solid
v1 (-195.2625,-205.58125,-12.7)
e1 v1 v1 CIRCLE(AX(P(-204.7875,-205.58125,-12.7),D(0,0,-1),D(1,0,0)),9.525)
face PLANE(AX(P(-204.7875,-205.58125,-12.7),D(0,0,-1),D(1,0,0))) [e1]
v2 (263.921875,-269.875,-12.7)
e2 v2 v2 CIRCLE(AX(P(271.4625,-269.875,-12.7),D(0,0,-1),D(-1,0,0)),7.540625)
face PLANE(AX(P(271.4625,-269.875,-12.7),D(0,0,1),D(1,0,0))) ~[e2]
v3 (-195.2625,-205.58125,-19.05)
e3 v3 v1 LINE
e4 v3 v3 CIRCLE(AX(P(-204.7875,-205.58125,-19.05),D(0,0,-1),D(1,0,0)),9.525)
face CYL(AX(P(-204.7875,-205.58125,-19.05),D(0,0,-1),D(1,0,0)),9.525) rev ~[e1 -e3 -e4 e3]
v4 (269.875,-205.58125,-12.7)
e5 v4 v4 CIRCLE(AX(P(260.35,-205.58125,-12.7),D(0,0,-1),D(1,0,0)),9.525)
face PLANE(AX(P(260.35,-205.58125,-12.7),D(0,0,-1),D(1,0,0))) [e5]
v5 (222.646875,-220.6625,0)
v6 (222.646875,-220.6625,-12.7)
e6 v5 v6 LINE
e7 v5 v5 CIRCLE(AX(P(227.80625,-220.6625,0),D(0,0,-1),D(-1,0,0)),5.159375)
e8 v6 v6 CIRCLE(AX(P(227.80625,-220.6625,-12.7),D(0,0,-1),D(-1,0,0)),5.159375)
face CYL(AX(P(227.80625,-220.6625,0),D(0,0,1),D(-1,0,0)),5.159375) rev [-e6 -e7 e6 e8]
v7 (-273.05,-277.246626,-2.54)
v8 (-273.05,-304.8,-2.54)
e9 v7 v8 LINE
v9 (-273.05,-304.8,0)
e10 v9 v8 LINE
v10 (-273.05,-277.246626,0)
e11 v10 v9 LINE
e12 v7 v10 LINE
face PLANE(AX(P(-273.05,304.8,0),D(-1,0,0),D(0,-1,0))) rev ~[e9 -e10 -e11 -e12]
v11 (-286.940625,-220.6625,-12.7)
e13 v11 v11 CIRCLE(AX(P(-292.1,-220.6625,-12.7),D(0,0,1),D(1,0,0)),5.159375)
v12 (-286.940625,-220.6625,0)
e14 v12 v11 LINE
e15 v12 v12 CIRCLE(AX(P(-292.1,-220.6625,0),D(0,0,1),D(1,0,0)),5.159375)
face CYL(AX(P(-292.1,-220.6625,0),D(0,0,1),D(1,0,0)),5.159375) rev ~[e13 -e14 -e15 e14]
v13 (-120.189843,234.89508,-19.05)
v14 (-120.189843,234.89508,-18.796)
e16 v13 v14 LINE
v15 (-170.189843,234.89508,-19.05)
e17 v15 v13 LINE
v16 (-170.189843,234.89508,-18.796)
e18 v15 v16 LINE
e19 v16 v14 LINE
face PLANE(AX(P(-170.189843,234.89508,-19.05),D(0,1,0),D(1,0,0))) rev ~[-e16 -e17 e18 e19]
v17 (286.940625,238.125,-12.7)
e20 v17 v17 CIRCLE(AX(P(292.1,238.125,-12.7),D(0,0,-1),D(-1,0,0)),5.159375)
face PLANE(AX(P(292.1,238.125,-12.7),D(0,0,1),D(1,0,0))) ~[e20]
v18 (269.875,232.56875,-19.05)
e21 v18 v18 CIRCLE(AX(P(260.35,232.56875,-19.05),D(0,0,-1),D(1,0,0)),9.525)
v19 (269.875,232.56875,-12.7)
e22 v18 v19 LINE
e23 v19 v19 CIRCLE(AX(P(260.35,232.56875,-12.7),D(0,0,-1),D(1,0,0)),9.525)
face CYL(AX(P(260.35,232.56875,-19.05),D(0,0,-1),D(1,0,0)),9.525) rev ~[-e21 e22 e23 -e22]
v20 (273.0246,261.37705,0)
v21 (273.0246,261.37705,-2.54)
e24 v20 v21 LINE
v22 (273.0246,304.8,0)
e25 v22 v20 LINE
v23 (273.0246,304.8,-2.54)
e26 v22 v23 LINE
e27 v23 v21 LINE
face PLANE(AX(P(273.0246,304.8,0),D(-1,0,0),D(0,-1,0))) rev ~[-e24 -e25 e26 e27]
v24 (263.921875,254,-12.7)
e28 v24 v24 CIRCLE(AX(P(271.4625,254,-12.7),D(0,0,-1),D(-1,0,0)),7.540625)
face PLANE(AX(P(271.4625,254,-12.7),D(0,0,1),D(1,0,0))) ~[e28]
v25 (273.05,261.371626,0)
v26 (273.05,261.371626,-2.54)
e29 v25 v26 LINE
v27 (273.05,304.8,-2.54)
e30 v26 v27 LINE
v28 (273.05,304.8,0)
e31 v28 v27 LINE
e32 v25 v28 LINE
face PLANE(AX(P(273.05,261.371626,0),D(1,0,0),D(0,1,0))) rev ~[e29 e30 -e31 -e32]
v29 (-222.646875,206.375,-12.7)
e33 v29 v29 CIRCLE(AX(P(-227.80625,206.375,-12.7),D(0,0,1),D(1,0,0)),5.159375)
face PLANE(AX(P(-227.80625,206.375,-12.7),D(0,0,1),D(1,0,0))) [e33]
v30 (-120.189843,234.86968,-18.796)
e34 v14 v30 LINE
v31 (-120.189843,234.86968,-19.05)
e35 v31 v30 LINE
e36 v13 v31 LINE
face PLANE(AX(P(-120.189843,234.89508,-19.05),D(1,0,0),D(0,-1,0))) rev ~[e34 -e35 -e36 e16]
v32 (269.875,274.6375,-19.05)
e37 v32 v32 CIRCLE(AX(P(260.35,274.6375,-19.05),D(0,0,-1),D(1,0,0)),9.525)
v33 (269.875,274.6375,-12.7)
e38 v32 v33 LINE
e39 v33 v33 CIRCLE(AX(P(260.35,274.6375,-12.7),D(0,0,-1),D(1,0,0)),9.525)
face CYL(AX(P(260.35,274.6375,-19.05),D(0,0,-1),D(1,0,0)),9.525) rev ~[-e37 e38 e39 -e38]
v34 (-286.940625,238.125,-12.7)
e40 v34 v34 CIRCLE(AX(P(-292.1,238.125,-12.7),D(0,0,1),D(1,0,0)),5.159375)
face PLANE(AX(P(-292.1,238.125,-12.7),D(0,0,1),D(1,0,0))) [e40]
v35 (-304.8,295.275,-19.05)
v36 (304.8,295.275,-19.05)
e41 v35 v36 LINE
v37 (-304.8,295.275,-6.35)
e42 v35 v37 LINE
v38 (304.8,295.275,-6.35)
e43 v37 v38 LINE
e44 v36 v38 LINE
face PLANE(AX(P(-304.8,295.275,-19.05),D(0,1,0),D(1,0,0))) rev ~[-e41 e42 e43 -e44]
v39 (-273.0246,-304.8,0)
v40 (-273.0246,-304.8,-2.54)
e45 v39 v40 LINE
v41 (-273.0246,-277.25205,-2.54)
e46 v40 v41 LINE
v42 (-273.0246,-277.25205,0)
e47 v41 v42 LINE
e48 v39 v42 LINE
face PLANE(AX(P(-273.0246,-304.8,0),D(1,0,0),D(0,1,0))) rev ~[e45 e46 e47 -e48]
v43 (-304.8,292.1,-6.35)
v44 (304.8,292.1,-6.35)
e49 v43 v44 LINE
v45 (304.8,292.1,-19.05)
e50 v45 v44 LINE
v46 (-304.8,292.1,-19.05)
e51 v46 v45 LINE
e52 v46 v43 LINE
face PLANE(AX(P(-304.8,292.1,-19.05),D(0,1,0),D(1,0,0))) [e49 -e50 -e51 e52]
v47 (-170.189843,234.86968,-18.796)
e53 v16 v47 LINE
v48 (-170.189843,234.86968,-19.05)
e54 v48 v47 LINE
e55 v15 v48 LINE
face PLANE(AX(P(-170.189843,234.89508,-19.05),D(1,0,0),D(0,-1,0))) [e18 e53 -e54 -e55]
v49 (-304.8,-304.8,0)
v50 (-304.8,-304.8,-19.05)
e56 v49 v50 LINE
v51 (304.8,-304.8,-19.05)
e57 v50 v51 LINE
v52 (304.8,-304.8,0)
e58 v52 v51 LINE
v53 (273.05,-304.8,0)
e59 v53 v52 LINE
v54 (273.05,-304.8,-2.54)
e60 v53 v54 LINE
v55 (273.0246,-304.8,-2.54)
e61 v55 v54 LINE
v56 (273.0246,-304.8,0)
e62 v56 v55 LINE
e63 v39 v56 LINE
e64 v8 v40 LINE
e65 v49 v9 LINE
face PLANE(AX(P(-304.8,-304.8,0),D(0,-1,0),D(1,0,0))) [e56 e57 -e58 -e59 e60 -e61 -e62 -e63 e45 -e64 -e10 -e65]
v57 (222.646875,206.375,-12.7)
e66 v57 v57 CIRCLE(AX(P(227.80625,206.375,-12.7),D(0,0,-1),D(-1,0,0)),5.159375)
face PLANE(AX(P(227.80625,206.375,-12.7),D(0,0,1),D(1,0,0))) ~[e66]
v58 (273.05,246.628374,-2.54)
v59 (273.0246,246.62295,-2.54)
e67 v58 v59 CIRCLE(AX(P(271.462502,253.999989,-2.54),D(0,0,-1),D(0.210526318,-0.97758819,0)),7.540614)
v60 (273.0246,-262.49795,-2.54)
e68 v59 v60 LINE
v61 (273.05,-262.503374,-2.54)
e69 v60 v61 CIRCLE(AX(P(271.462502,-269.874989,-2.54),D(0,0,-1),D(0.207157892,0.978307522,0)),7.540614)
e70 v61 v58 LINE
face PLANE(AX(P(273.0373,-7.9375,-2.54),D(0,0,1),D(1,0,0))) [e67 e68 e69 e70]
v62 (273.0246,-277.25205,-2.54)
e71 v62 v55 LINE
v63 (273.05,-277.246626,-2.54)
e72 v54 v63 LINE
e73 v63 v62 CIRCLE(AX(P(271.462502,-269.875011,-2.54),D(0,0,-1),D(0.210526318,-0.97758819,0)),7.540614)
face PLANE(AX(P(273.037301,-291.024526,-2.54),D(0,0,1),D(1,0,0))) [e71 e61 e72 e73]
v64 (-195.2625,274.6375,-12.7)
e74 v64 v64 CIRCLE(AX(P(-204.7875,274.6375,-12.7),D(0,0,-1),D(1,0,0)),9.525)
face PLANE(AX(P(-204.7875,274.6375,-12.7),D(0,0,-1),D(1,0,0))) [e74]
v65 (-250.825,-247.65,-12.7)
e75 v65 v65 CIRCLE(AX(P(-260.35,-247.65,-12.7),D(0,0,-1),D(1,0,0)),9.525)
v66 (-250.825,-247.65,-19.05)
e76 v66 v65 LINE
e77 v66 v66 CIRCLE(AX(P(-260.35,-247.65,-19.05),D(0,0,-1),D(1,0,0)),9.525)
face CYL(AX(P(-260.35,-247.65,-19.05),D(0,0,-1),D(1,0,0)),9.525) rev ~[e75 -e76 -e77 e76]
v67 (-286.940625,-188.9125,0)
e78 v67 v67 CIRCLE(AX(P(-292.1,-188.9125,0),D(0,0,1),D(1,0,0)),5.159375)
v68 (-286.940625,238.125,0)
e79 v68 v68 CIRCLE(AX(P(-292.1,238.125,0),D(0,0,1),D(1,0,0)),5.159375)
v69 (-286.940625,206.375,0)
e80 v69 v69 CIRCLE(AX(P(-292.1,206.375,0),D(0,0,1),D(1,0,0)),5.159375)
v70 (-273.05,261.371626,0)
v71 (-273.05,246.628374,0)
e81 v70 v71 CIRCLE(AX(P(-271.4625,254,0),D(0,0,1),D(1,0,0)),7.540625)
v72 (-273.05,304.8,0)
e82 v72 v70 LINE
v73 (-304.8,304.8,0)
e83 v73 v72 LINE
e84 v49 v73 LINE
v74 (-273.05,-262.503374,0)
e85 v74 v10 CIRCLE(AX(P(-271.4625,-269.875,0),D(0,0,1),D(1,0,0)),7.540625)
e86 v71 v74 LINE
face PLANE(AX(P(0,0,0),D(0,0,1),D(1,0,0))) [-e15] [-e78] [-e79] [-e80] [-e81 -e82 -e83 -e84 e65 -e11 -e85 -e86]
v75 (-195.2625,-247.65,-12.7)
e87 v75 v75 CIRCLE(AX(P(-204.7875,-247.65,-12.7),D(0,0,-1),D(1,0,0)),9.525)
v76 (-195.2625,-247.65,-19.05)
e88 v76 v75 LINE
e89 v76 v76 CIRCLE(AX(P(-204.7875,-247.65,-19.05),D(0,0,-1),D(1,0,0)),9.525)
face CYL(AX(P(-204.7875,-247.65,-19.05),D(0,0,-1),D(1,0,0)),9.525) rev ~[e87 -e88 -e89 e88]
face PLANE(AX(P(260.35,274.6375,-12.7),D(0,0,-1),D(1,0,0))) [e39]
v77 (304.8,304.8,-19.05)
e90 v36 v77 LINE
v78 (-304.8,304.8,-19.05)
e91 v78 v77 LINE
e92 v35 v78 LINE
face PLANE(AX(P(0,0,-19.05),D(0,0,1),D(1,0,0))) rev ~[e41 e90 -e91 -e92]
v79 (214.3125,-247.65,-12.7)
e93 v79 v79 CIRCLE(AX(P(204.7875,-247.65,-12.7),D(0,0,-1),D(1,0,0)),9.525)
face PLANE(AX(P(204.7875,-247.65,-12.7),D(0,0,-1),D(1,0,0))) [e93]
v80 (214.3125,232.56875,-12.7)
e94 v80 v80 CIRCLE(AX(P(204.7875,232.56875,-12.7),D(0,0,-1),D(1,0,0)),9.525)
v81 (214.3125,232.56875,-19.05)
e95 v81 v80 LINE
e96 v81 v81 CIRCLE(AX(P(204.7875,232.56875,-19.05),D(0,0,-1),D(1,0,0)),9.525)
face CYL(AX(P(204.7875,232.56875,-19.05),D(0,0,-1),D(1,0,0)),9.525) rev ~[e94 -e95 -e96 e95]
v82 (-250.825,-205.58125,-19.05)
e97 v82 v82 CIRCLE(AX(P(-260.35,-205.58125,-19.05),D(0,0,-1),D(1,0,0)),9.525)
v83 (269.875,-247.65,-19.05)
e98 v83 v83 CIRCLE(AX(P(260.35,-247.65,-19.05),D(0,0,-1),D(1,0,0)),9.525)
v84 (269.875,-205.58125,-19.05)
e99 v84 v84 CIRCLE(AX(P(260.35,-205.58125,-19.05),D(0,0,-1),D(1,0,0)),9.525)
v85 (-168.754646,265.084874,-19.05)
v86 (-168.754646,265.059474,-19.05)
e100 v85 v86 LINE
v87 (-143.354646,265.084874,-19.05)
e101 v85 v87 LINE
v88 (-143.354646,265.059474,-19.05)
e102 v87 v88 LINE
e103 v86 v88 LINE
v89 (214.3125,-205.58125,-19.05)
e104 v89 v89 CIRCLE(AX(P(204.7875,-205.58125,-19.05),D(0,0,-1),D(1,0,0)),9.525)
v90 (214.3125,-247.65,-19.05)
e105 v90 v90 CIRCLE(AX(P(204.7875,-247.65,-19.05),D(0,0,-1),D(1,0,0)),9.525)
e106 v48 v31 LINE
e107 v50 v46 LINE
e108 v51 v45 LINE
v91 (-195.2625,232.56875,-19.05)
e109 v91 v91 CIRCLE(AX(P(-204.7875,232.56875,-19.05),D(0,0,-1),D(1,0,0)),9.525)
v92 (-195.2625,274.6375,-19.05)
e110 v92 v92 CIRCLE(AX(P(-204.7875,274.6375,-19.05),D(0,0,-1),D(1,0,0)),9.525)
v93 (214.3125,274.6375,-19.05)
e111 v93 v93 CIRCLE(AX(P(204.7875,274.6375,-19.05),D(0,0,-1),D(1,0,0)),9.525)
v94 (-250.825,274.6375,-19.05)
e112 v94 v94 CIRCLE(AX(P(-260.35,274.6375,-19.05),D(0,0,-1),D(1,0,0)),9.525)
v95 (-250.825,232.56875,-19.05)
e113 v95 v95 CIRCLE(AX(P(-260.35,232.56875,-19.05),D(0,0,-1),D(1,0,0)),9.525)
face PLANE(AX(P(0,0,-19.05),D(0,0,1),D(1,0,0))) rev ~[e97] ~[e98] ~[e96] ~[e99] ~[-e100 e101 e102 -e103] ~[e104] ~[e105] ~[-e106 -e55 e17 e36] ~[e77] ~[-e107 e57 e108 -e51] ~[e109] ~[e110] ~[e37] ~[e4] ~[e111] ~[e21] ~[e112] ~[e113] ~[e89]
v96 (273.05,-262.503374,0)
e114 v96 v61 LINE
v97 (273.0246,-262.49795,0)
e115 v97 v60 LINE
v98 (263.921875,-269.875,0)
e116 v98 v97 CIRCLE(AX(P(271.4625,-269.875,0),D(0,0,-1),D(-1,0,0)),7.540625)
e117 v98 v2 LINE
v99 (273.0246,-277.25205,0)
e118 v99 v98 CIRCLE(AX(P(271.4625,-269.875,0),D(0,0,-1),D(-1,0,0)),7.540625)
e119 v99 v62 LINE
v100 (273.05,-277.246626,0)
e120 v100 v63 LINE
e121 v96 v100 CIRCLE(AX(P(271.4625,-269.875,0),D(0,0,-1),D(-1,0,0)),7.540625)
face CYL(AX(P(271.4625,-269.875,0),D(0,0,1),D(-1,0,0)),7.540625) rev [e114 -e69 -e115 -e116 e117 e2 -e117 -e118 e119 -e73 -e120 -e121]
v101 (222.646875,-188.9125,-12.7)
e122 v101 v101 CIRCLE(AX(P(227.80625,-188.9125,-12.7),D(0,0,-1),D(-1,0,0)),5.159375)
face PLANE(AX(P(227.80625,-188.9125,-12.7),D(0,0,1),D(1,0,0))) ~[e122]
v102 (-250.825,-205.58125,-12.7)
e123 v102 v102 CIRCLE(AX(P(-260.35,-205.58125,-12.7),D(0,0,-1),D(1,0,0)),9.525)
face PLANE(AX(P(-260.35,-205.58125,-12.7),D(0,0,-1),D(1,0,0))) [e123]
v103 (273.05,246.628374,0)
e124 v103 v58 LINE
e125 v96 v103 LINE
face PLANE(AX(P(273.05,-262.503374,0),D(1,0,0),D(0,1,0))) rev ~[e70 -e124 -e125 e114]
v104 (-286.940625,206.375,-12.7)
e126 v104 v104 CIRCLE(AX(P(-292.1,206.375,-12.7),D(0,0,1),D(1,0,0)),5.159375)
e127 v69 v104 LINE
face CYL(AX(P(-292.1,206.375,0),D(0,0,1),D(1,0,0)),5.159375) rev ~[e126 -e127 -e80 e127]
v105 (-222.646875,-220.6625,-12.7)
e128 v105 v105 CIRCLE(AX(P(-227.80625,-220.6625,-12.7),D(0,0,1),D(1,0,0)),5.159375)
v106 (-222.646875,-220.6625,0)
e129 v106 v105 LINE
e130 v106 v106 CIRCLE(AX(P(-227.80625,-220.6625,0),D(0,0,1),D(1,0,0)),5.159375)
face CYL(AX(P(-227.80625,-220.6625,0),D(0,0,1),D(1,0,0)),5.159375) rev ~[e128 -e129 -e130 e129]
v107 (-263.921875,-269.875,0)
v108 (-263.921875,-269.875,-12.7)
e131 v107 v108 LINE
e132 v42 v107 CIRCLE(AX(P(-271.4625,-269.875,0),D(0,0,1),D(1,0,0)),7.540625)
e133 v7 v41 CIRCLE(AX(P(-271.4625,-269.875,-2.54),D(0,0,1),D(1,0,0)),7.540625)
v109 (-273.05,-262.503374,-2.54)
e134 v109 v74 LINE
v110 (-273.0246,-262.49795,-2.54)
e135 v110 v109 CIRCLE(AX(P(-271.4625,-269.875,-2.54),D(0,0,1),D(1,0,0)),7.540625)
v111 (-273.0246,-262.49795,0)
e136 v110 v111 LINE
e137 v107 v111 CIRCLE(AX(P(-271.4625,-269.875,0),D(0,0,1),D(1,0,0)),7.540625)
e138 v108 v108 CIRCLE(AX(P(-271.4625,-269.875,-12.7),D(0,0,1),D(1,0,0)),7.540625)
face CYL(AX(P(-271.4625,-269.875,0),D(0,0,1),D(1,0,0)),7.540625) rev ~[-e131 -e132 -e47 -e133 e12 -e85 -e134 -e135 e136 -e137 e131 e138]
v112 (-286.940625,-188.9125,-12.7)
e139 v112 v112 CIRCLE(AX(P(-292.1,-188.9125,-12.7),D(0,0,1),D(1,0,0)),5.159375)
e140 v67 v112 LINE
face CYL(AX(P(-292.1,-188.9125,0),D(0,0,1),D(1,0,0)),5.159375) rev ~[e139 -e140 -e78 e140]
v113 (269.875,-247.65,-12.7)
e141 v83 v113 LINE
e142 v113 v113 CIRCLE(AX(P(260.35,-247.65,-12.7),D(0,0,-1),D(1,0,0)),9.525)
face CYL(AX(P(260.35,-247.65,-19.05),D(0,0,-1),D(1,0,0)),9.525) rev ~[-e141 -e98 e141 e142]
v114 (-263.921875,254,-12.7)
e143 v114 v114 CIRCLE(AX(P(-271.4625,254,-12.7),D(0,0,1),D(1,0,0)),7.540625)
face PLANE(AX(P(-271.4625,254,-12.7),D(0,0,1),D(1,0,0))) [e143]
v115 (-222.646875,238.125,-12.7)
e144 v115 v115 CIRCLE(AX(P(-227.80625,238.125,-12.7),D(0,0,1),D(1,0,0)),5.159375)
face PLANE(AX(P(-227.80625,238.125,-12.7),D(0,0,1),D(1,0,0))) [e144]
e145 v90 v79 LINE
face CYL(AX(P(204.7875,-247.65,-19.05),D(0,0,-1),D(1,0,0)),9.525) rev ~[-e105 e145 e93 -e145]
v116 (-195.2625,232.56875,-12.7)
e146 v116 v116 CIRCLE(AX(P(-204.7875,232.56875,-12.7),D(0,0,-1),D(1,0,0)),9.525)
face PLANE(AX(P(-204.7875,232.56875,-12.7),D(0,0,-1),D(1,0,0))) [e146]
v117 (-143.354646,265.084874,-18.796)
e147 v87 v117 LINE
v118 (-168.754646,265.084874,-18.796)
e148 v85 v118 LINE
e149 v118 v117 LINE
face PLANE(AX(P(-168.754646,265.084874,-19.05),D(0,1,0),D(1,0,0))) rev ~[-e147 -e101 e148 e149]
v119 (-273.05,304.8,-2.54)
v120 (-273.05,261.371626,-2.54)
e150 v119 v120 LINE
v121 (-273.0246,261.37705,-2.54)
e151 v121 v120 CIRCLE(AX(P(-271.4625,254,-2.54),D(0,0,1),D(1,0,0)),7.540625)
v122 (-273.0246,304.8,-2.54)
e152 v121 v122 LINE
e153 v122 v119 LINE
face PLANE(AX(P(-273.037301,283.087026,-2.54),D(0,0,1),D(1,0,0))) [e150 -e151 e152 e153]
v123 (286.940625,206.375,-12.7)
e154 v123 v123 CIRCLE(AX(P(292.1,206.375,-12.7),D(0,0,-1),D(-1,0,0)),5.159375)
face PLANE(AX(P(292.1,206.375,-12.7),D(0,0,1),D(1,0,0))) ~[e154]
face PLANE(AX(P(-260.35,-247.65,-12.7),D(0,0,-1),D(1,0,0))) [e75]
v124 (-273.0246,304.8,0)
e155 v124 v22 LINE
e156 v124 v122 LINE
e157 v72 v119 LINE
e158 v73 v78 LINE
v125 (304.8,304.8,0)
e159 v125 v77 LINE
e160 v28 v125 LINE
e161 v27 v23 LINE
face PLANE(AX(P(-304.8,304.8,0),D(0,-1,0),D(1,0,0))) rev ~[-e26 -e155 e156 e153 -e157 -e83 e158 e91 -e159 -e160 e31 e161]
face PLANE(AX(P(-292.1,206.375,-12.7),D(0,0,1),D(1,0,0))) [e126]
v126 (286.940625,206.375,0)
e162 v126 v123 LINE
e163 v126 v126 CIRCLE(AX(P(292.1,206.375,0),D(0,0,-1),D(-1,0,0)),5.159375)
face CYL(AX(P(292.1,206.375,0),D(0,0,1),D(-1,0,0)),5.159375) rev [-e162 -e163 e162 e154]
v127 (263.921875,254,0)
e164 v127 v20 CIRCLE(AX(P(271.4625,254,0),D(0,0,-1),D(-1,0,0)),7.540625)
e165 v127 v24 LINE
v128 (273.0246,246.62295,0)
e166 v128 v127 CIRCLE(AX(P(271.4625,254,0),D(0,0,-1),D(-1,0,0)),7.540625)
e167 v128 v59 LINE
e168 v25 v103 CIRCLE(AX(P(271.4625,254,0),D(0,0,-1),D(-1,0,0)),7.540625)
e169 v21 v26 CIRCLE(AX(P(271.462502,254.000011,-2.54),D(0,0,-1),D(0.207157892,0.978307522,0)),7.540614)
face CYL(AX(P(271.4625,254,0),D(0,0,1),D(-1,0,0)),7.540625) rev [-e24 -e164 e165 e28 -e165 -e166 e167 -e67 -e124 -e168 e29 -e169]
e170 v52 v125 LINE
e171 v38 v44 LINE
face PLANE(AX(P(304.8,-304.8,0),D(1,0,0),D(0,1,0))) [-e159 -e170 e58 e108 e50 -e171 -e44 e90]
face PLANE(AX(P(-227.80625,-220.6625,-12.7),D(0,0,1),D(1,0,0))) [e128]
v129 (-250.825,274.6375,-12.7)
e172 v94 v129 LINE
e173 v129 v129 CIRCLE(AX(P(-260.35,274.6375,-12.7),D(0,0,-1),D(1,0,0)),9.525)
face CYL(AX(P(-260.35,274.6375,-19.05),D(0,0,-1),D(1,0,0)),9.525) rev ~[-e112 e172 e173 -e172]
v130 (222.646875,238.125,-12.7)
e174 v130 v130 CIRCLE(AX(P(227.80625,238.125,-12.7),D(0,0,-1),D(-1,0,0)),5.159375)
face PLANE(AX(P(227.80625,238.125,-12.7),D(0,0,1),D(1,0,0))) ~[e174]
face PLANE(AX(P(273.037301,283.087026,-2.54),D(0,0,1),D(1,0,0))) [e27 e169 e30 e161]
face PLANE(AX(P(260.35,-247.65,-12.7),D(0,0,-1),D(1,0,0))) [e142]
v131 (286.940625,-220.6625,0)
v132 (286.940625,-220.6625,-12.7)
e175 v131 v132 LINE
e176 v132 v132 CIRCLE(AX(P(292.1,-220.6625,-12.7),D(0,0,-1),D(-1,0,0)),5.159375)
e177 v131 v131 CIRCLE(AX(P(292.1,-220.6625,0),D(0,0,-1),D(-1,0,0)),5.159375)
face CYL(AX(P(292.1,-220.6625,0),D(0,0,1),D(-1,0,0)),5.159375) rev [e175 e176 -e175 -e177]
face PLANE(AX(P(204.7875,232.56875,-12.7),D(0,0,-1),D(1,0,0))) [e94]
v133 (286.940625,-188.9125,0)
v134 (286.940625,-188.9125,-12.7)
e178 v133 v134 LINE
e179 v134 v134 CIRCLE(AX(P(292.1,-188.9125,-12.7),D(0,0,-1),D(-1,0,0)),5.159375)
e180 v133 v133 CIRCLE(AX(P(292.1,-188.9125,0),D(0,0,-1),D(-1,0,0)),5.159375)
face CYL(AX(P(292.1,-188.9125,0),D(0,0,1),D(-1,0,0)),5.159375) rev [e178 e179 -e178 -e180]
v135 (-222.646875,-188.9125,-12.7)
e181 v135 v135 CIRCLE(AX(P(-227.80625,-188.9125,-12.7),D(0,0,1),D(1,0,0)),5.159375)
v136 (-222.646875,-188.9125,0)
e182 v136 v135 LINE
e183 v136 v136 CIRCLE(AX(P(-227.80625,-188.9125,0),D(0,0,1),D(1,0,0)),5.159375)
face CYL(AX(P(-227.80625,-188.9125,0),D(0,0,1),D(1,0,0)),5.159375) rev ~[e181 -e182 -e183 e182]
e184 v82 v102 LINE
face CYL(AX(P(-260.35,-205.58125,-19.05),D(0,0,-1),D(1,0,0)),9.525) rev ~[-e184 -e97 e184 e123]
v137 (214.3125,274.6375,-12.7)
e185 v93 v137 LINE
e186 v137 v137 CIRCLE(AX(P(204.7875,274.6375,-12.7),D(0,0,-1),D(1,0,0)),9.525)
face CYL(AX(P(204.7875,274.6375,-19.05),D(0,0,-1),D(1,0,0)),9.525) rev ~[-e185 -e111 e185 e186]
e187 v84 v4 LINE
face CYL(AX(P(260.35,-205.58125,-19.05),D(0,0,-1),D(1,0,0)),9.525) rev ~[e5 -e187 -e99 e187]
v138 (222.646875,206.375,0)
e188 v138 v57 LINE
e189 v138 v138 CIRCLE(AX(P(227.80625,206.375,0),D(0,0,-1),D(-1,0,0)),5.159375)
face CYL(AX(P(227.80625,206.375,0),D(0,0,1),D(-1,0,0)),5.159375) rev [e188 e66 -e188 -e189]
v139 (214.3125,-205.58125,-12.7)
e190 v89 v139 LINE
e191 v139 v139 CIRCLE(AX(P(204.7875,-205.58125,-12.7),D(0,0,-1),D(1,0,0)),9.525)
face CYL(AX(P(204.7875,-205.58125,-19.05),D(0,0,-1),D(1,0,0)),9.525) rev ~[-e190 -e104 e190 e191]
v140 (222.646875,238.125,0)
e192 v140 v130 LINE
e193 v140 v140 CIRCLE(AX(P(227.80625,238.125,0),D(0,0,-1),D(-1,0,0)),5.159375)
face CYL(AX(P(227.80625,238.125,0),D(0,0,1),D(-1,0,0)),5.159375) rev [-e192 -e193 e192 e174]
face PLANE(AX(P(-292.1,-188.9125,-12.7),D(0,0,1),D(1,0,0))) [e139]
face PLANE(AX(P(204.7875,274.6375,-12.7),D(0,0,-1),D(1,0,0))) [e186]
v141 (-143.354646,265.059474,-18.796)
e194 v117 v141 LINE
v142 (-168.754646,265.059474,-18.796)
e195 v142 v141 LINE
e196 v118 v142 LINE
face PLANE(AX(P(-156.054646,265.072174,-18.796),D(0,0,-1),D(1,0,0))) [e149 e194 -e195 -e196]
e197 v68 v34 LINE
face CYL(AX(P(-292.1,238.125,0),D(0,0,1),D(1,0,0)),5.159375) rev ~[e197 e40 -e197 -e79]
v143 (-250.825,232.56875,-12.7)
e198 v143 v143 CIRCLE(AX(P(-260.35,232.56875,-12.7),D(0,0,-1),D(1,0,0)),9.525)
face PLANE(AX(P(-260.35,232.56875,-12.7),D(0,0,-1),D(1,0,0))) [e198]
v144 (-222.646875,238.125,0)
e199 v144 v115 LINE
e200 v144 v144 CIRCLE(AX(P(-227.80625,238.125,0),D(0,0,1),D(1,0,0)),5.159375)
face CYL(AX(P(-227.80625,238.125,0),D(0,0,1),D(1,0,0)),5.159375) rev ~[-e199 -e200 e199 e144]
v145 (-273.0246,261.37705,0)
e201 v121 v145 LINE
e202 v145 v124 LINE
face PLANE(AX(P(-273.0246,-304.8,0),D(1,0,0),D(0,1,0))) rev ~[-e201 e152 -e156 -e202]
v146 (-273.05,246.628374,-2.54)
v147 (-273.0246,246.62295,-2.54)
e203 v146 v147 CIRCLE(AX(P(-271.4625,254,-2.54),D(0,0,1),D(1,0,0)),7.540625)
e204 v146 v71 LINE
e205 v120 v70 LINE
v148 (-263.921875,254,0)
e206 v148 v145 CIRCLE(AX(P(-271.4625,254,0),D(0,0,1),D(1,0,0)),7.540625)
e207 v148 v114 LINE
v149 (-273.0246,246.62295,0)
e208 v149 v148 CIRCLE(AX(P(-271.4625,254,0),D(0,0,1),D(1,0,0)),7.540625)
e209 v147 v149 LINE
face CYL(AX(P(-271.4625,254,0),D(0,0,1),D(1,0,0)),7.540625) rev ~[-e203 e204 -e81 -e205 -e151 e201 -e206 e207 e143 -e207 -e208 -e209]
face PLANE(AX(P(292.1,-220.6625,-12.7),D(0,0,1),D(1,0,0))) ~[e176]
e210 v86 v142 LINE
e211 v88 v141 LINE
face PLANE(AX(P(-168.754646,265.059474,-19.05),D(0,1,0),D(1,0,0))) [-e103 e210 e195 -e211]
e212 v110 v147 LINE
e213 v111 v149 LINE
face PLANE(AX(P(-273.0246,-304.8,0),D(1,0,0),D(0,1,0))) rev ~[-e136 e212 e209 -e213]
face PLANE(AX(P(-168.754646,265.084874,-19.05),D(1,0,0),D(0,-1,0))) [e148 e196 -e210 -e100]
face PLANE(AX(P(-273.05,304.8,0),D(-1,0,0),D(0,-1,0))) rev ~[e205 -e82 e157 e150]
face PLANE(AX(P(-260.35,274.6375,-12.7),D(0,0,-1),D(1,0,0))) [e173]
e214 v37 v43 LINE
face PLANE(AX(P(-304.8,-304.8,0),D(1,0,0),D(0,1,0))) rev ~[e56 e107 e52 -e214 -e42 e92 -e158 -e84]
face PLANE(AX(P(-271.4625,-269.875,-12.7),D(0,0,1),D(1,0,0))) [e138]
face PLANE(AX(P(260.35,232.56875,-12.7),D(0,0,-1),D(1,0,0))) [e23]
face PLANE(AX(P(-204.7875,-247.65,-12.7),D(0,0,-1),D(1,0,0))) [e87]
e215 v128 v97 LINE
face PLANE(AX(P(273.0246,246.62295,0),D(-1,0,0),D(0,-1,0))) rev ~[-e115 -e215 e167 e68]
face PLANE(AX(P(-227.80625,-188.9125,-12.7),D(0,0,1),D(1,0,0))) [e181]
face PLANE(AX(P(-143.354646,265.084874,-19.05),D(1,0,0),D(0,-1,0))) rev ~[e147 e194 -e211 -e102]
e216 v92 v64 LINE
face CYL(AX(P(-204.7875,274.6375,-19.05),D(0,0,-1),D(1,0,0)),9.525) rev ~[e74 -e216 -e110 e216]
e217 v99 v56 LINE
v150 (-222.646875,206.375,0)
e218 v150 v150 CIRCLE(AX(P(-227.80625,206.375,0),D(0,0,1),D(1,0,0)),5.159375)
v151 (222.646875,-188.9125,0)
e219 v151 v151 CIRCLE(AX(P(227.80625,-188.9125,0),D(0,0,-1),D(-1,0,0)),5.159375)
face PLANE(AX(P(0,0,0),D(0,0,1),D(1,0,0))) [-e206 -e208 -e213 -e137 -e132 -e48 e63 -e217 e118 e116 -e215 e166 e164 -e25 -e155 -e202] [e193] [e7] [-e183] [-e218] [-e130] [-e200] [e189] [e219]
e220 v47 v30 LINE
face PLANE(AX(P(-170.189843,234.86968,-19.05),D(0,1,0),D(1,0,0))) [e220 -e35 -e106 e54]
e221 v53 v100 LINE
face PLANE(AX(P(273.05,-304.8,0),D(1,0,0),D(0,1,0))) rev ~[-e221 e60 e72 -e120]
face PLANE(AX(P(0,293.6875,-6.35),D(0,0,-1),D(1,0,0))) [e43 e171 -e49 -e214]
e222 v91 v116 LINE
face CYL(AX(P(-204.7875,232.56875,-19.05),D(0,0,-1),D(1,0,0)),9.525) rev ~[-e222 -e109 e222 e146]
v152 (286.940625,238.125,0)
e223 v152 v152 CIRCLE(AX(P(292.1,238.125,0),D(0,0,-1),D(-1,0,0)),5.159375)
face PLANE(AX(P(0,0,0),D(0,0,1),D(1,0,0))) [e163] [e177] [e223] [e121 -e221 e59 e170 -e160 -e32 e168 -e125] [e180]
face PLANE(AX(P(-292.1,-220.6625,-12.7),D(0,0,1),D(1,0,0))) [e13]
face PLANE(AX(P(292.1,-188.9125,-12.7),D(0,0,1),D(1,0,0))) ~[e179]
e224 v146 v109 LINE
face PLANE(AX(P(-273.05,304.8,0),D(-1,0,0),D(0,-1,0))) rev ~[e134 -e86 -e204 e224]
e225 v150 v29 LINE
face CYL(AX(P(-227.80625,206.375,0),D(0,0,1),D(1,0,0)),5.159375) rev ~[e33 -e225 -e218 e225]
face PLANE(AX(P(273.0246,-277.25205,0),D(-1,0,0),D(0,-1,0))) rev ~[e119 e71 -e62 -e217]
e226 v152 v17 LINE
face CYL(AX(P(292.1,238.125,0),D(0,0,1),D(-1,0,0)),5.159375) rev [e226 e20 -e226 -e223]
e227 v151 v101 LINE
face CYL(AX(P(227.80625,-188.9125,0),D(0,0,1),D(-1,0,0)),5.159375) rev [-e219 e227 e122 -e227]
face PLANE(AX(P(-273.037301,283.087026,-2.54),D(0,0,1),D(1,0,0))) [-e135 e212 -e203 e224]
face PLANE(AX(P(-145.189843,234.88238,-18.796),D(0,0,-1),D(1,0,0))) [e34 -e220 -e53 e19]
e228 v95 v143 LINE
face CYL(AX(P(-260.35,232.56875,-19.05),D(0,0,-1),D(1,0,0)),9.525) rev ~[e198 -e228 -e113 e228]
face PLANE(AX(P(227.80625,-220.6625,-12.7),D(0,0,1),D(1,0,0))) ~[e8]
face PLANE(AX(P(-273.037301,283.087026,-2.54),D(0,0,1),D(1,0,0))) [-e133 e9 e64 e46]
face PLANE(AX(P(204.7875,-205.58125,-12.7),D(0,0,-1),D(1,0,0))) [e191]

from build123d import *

# Parameters (mm, degrees)
F0_W      = 609.6
F0_H      = 609.6
F0_R      = 7.540625
F0_R_2    = 5.159375
F1_DEPTH  = 19.05
F2_DEPTH  = 12.7
F3_W      = 609.6
F3_H      = 3.175
F4_DEPTH  = 12.7
F5_R      = 9.525
F6_DEPTH  = 6.35
F7_W      = 25.4
F7_H      = 0.0254
F7_W_2    = 50
F8_DEPTH  = 0.254
F10_DEPTH = 2.54


# Not quite as in the source:
# - a pattern or mirror of a feature is missing from the dataset's text; its kind, count and spacing are read off the source's solid


with BuildPart() as f1:
    # F0 (on Top) → F1 (new body)
    with BuildSketch(Plane.XY):
        Rectangle(F0_W, F0_H)
        with Locations((-271.4625, -269.875)):
            Circle(F0_R, mode=Mode.SUBTRACT)
        with Locations((-292.1, -220.6625)):
            Circle(F0_R_2, mode=Mode.SUBTRACT)
        with Locations((-292.1, -188.9125)):
            Circle(F0_R_2, mode=Mode.SUBTRACT)
        with Locations((-227.80625, -220.6625)):
            Circle(F0_R_2, mode=Mode.SUBTRACT)
        with Locations((-227.80625, -188.9125)):
            Circle(F0_R_2, mode=Mode.SUBTRACT)
        with Locations((-292.1, 206.375)):
            Circle(F0_R_2, mode=Mode.SUBTRACT)
        with Locations((-227.80625, 206.375)):
            Circle(F0_R_2, mode=Mode.SUBTRACT)
        with Locations((-292.1, 238.125)):
            Circle(F0_R_2, mode=Mode.SUBTRACT)
        with Locations((-271.4625, 254)):
            Circle(F0_R, mode=Mode.SUBTRACT)
        with Locations((-227.80625, 238.125)):
            Circle(F0_R_2, mode=Mode.SUBTRACT)
        with Locations((-271.4625, 254)):
            Circle(F0_R)
        with Locations((-292.1, 238.125)):
            Circle(F0_R_2)
        with Locations((-292.1, 206.375)):
            Circle(F0_R_2)
        with Locations((-227.80625, 206.375)):
            Circle(F0_R_2)
        with Locations((-227.80625, 238.125)):
            Circle(F0_R_2)
        with Locations((-227.80625, -188.9125)):
            Circle(F0_R_2)
        with Locations((-227.80625, -220.6625)):
            Circle(F0_R_2)
        with Locations((-292.1, -220.6625)):
            Circle(F0_R_2)
        with Locations((-292.1, -188.9125)):
            Circle(F0_R_2)
        with Locations((-271.4625, -269.875)):
            Circle(F0_R)
    extrude(amount=-F1_DEPTH)

    # F0 (on Top) → F2 (cut)
    with BuildSketch(Plane.XY):
        with Locations((-271.4625, -269.875)):
            Circle(F0_R)
        with Locations((-292.1, -220.6625)):
            Circle(F0_R_2)
        with Locations((-227.80625, -220.6625)):
            Circle(F0_R_2)
        with Locations((-227.80625, -188.9125)):
            Circle(F0_R_2)
        with Locations((-292.1, -188.9125)):
            Circle(F0_R_2)
        with Locations((-292.1, 206.375)):
            Circle(F0_R_2)
        with Locations((-227.80625, 206.375)):
            Circle(F0_R_2)
        with Locations((-227.80625, 238.125)):
            Circle(F0_R_2)
        with Locations((-292.1, 238.125)):
            Circle(F0_R_2)
        with Locations((-271.4625, 254)):
            Circle(F0_R)
    f2 = extrude(amount=-F2_DEPTH, mode=Mode.SUBTRACT)

    # F2_copies: F2 across plane
    add(f2.mirror(Plane(origin=(0, 0, 0), x_dir=(0, 0, 1), z_dir=(1, 0, 0))), mode=Mode.SUBTRACT)

    # F3 (on face) → F4 (cut)
    with BuildSketch(Plane(origin=(0, 0, -19.05), x_dir=(1, 0, 0), z_dir=(0, 0, -1))):
        with Locations((0, -293.6875)):
            Rectangle(F3_W, F3_H)
    extrude(amount=-F4_DEPTH, mode=Mode.SUBTRACT)

    # F5 (on face) → F6 (cut)
    with BuildSketch(Plane(origin=(0, 0, -19.05), x_dir=(1, 0, 0), z_dir=(0, 0, -1))):
        with Locations((260.35, -274.6375)):
            Circle(F5_R)
        with Locations((204.7875, -274.6375)):
            Circle(F5_R)
        with Locations((204.7875, -232.56875)):
            Circle(F5_R)
        with Locations((260.35, -232.56875)):
            Circle(F5_R)
        with Locations((-204.7875, -274.6375)):
            Circle(F5_R)
        with Locations((-260.35, -274.6375)):
            Circle(F5_R)
        with Locations((-260.35, -232.56875)):
            Circle(F5_R)
        with Locations((-204.7875, -232.56875)):
            Circle(F5_R)
        with Locations((-204.7875, 205.58125)):
            Circle(F5_R)
        with Locations((-260.35, 205.58125)):
            Circle(F5_R)
        with Locations((-260.35, 247.65)):
            Circle(F5_R)
        with Locations((-204.7875, 247.65)):
            Circle(F5_R)
        with Locations((204.7875, 247.65)):
            Circle(F5_R)
        with Locations((204.7875, 205.58125)):
            Circle(F5_R)
        with Locations((260.35, 205.58125)):
            Circle(F5_R)
        with Locations((260.35, 247.65)):
            Circle(F5_R)
    extrude(amount=-F6_DEPTH, mode=Mode.SUBTRACT)

    # F7 (on face) → F8 (cut)
    with BuildSketch(Plane(origin=(0, 0, -19.05), x_dir=(1, 0, 0), z_dir=(0, 0, -1))):
        with Locations((-156.0546457767, -265.0721735465)):
            Rectangle(F7_W, F7_H)
        with Locations((-145.1898425817, -234.882380328)):
            Rectangle(F7_W_2, F7_H)
    extrude(amount=-F8_DEPTH, mode=Mode.SUBTRACT)

    # F9 (on face) → F10 (cut)
    with BuildSketch(Plane.XY):
        with BuildLine():
            Line((-273.0246, 304.8), (-273.05, 304.8))
            Line((-273.05, 304.8), (-273.05, 261.3716259496))
            ThreePointArc((-273.05, 261.3716259496), (-273.0373023354, 261.3743489879), (-273.0246, 261.3770501544))
            Line((-273.0246, 261.3770501544), (-273.0246, 304.8))
        make_face()
        with BuildLine():
            ThreePointArc((-273.0246, 261.3770501544), (-273.0373023354, 261.3743489879), (-273.05, 261.3716259496))
            Line((-273.05, 261.3716259496), (-273.05, 246.6283740504))
            ThreePointArc((-273.05, 246.6283740504), (-273.0373023354, 246.6256510121), (-273.0246, 246.6229498456))
            Line((-273.0246, 246.6229498456), (-273.0246, 261.3770501544))
        make_face()
        with BuildLine():
            Line((273.05, 304.8), (273.0246, 304.8))
            Line((273.0246, 304.8), (273.0246, 261.3770501544))
            ThreePointArc((273.0246, 261.3770501544), (273.0373023354, 261.3743489879), (273.05, 261.3716259496))
            Line((273.05, 261.3716259496), (273.05, 304.8))
        make_face()
        with BuildLine():
            ThreePointArc((-273.0246, 246.6229498456), (-273.0373023354, 246.6256510121), (-273.05, 246.6283740504))
            Line((-273.05, 246.6283740504), (-273.05, -262.5033740504))
            ThreePointArc((-273.05, -262.5033740504), (-273.0373023354, -262.5006510121), (-273.0246, -262.4979498456))
            Line((-273.0246, -262.4979498456), (-273.0246, 246.6229498456))
        make_face()
        with BuildLine():
            ThreePointArc((-273.0246, -262.4979498456), (-273.0373023354, -262.5006510121), (-273.05, -262.5033740504))
            Line((-273.05, -262.5033740504), (-273.05, -277.2466259496))
            ThreePointArc((-273.05, -277.2466259496), (-273.0373023354, -277.2493489879), (-273.0246, -277.2520501544))
            Line((-273.0246, -277.2520501544), (-273.0246, -262.4979498456))
        make_face()
        with BuildLine():
            Line((-273.05, -277.2466259496), (-273.05, -304.8))
            Line((-273.05, -304.8), (-273.0246, -304.8))
            Line((-273.0246, -304.8), (-273.0246, -277.2520501544))
            ThreePointArc((-273.0246, -277.2520501544), (-273.0373023354, -277.2493489879), (-273.05, -277.2466259496))
        make_face()
        with BuildLine():
            ThreePointArc((273.05, 246.6283740504), (273.0373023354, 246.6256510121), (273.0246, 246.6229498456))
            Line((273.0246, 246.6229498456), (273.0246, -262.4979498456))
            ThreePointArc((273.0246, -262.4979498456), (273.0373023354, -262.5006510121), (273.05, -262.5033740504))
            Line((273.05, -262.5033740504), (273.05, 246.6283740504))
        make_face()
        with BuildLine():
            Line((273.0246, -277.2520501544), (273.0246, -304.8))
            Line((273.0246, -304.8), (273.05, -304.8))
            Line((273.05, -304.8), (273.05, -277.2466259496))
            ThreePointArc((273.05, -277.2466259496), (273.0373023354, -277.2493489879), (273.0246, -277.2520501544))
        make_face()
    extrude(amount=-F10_DEPTH, mode=Mode.SUBTRACT)


solid = f1.part
